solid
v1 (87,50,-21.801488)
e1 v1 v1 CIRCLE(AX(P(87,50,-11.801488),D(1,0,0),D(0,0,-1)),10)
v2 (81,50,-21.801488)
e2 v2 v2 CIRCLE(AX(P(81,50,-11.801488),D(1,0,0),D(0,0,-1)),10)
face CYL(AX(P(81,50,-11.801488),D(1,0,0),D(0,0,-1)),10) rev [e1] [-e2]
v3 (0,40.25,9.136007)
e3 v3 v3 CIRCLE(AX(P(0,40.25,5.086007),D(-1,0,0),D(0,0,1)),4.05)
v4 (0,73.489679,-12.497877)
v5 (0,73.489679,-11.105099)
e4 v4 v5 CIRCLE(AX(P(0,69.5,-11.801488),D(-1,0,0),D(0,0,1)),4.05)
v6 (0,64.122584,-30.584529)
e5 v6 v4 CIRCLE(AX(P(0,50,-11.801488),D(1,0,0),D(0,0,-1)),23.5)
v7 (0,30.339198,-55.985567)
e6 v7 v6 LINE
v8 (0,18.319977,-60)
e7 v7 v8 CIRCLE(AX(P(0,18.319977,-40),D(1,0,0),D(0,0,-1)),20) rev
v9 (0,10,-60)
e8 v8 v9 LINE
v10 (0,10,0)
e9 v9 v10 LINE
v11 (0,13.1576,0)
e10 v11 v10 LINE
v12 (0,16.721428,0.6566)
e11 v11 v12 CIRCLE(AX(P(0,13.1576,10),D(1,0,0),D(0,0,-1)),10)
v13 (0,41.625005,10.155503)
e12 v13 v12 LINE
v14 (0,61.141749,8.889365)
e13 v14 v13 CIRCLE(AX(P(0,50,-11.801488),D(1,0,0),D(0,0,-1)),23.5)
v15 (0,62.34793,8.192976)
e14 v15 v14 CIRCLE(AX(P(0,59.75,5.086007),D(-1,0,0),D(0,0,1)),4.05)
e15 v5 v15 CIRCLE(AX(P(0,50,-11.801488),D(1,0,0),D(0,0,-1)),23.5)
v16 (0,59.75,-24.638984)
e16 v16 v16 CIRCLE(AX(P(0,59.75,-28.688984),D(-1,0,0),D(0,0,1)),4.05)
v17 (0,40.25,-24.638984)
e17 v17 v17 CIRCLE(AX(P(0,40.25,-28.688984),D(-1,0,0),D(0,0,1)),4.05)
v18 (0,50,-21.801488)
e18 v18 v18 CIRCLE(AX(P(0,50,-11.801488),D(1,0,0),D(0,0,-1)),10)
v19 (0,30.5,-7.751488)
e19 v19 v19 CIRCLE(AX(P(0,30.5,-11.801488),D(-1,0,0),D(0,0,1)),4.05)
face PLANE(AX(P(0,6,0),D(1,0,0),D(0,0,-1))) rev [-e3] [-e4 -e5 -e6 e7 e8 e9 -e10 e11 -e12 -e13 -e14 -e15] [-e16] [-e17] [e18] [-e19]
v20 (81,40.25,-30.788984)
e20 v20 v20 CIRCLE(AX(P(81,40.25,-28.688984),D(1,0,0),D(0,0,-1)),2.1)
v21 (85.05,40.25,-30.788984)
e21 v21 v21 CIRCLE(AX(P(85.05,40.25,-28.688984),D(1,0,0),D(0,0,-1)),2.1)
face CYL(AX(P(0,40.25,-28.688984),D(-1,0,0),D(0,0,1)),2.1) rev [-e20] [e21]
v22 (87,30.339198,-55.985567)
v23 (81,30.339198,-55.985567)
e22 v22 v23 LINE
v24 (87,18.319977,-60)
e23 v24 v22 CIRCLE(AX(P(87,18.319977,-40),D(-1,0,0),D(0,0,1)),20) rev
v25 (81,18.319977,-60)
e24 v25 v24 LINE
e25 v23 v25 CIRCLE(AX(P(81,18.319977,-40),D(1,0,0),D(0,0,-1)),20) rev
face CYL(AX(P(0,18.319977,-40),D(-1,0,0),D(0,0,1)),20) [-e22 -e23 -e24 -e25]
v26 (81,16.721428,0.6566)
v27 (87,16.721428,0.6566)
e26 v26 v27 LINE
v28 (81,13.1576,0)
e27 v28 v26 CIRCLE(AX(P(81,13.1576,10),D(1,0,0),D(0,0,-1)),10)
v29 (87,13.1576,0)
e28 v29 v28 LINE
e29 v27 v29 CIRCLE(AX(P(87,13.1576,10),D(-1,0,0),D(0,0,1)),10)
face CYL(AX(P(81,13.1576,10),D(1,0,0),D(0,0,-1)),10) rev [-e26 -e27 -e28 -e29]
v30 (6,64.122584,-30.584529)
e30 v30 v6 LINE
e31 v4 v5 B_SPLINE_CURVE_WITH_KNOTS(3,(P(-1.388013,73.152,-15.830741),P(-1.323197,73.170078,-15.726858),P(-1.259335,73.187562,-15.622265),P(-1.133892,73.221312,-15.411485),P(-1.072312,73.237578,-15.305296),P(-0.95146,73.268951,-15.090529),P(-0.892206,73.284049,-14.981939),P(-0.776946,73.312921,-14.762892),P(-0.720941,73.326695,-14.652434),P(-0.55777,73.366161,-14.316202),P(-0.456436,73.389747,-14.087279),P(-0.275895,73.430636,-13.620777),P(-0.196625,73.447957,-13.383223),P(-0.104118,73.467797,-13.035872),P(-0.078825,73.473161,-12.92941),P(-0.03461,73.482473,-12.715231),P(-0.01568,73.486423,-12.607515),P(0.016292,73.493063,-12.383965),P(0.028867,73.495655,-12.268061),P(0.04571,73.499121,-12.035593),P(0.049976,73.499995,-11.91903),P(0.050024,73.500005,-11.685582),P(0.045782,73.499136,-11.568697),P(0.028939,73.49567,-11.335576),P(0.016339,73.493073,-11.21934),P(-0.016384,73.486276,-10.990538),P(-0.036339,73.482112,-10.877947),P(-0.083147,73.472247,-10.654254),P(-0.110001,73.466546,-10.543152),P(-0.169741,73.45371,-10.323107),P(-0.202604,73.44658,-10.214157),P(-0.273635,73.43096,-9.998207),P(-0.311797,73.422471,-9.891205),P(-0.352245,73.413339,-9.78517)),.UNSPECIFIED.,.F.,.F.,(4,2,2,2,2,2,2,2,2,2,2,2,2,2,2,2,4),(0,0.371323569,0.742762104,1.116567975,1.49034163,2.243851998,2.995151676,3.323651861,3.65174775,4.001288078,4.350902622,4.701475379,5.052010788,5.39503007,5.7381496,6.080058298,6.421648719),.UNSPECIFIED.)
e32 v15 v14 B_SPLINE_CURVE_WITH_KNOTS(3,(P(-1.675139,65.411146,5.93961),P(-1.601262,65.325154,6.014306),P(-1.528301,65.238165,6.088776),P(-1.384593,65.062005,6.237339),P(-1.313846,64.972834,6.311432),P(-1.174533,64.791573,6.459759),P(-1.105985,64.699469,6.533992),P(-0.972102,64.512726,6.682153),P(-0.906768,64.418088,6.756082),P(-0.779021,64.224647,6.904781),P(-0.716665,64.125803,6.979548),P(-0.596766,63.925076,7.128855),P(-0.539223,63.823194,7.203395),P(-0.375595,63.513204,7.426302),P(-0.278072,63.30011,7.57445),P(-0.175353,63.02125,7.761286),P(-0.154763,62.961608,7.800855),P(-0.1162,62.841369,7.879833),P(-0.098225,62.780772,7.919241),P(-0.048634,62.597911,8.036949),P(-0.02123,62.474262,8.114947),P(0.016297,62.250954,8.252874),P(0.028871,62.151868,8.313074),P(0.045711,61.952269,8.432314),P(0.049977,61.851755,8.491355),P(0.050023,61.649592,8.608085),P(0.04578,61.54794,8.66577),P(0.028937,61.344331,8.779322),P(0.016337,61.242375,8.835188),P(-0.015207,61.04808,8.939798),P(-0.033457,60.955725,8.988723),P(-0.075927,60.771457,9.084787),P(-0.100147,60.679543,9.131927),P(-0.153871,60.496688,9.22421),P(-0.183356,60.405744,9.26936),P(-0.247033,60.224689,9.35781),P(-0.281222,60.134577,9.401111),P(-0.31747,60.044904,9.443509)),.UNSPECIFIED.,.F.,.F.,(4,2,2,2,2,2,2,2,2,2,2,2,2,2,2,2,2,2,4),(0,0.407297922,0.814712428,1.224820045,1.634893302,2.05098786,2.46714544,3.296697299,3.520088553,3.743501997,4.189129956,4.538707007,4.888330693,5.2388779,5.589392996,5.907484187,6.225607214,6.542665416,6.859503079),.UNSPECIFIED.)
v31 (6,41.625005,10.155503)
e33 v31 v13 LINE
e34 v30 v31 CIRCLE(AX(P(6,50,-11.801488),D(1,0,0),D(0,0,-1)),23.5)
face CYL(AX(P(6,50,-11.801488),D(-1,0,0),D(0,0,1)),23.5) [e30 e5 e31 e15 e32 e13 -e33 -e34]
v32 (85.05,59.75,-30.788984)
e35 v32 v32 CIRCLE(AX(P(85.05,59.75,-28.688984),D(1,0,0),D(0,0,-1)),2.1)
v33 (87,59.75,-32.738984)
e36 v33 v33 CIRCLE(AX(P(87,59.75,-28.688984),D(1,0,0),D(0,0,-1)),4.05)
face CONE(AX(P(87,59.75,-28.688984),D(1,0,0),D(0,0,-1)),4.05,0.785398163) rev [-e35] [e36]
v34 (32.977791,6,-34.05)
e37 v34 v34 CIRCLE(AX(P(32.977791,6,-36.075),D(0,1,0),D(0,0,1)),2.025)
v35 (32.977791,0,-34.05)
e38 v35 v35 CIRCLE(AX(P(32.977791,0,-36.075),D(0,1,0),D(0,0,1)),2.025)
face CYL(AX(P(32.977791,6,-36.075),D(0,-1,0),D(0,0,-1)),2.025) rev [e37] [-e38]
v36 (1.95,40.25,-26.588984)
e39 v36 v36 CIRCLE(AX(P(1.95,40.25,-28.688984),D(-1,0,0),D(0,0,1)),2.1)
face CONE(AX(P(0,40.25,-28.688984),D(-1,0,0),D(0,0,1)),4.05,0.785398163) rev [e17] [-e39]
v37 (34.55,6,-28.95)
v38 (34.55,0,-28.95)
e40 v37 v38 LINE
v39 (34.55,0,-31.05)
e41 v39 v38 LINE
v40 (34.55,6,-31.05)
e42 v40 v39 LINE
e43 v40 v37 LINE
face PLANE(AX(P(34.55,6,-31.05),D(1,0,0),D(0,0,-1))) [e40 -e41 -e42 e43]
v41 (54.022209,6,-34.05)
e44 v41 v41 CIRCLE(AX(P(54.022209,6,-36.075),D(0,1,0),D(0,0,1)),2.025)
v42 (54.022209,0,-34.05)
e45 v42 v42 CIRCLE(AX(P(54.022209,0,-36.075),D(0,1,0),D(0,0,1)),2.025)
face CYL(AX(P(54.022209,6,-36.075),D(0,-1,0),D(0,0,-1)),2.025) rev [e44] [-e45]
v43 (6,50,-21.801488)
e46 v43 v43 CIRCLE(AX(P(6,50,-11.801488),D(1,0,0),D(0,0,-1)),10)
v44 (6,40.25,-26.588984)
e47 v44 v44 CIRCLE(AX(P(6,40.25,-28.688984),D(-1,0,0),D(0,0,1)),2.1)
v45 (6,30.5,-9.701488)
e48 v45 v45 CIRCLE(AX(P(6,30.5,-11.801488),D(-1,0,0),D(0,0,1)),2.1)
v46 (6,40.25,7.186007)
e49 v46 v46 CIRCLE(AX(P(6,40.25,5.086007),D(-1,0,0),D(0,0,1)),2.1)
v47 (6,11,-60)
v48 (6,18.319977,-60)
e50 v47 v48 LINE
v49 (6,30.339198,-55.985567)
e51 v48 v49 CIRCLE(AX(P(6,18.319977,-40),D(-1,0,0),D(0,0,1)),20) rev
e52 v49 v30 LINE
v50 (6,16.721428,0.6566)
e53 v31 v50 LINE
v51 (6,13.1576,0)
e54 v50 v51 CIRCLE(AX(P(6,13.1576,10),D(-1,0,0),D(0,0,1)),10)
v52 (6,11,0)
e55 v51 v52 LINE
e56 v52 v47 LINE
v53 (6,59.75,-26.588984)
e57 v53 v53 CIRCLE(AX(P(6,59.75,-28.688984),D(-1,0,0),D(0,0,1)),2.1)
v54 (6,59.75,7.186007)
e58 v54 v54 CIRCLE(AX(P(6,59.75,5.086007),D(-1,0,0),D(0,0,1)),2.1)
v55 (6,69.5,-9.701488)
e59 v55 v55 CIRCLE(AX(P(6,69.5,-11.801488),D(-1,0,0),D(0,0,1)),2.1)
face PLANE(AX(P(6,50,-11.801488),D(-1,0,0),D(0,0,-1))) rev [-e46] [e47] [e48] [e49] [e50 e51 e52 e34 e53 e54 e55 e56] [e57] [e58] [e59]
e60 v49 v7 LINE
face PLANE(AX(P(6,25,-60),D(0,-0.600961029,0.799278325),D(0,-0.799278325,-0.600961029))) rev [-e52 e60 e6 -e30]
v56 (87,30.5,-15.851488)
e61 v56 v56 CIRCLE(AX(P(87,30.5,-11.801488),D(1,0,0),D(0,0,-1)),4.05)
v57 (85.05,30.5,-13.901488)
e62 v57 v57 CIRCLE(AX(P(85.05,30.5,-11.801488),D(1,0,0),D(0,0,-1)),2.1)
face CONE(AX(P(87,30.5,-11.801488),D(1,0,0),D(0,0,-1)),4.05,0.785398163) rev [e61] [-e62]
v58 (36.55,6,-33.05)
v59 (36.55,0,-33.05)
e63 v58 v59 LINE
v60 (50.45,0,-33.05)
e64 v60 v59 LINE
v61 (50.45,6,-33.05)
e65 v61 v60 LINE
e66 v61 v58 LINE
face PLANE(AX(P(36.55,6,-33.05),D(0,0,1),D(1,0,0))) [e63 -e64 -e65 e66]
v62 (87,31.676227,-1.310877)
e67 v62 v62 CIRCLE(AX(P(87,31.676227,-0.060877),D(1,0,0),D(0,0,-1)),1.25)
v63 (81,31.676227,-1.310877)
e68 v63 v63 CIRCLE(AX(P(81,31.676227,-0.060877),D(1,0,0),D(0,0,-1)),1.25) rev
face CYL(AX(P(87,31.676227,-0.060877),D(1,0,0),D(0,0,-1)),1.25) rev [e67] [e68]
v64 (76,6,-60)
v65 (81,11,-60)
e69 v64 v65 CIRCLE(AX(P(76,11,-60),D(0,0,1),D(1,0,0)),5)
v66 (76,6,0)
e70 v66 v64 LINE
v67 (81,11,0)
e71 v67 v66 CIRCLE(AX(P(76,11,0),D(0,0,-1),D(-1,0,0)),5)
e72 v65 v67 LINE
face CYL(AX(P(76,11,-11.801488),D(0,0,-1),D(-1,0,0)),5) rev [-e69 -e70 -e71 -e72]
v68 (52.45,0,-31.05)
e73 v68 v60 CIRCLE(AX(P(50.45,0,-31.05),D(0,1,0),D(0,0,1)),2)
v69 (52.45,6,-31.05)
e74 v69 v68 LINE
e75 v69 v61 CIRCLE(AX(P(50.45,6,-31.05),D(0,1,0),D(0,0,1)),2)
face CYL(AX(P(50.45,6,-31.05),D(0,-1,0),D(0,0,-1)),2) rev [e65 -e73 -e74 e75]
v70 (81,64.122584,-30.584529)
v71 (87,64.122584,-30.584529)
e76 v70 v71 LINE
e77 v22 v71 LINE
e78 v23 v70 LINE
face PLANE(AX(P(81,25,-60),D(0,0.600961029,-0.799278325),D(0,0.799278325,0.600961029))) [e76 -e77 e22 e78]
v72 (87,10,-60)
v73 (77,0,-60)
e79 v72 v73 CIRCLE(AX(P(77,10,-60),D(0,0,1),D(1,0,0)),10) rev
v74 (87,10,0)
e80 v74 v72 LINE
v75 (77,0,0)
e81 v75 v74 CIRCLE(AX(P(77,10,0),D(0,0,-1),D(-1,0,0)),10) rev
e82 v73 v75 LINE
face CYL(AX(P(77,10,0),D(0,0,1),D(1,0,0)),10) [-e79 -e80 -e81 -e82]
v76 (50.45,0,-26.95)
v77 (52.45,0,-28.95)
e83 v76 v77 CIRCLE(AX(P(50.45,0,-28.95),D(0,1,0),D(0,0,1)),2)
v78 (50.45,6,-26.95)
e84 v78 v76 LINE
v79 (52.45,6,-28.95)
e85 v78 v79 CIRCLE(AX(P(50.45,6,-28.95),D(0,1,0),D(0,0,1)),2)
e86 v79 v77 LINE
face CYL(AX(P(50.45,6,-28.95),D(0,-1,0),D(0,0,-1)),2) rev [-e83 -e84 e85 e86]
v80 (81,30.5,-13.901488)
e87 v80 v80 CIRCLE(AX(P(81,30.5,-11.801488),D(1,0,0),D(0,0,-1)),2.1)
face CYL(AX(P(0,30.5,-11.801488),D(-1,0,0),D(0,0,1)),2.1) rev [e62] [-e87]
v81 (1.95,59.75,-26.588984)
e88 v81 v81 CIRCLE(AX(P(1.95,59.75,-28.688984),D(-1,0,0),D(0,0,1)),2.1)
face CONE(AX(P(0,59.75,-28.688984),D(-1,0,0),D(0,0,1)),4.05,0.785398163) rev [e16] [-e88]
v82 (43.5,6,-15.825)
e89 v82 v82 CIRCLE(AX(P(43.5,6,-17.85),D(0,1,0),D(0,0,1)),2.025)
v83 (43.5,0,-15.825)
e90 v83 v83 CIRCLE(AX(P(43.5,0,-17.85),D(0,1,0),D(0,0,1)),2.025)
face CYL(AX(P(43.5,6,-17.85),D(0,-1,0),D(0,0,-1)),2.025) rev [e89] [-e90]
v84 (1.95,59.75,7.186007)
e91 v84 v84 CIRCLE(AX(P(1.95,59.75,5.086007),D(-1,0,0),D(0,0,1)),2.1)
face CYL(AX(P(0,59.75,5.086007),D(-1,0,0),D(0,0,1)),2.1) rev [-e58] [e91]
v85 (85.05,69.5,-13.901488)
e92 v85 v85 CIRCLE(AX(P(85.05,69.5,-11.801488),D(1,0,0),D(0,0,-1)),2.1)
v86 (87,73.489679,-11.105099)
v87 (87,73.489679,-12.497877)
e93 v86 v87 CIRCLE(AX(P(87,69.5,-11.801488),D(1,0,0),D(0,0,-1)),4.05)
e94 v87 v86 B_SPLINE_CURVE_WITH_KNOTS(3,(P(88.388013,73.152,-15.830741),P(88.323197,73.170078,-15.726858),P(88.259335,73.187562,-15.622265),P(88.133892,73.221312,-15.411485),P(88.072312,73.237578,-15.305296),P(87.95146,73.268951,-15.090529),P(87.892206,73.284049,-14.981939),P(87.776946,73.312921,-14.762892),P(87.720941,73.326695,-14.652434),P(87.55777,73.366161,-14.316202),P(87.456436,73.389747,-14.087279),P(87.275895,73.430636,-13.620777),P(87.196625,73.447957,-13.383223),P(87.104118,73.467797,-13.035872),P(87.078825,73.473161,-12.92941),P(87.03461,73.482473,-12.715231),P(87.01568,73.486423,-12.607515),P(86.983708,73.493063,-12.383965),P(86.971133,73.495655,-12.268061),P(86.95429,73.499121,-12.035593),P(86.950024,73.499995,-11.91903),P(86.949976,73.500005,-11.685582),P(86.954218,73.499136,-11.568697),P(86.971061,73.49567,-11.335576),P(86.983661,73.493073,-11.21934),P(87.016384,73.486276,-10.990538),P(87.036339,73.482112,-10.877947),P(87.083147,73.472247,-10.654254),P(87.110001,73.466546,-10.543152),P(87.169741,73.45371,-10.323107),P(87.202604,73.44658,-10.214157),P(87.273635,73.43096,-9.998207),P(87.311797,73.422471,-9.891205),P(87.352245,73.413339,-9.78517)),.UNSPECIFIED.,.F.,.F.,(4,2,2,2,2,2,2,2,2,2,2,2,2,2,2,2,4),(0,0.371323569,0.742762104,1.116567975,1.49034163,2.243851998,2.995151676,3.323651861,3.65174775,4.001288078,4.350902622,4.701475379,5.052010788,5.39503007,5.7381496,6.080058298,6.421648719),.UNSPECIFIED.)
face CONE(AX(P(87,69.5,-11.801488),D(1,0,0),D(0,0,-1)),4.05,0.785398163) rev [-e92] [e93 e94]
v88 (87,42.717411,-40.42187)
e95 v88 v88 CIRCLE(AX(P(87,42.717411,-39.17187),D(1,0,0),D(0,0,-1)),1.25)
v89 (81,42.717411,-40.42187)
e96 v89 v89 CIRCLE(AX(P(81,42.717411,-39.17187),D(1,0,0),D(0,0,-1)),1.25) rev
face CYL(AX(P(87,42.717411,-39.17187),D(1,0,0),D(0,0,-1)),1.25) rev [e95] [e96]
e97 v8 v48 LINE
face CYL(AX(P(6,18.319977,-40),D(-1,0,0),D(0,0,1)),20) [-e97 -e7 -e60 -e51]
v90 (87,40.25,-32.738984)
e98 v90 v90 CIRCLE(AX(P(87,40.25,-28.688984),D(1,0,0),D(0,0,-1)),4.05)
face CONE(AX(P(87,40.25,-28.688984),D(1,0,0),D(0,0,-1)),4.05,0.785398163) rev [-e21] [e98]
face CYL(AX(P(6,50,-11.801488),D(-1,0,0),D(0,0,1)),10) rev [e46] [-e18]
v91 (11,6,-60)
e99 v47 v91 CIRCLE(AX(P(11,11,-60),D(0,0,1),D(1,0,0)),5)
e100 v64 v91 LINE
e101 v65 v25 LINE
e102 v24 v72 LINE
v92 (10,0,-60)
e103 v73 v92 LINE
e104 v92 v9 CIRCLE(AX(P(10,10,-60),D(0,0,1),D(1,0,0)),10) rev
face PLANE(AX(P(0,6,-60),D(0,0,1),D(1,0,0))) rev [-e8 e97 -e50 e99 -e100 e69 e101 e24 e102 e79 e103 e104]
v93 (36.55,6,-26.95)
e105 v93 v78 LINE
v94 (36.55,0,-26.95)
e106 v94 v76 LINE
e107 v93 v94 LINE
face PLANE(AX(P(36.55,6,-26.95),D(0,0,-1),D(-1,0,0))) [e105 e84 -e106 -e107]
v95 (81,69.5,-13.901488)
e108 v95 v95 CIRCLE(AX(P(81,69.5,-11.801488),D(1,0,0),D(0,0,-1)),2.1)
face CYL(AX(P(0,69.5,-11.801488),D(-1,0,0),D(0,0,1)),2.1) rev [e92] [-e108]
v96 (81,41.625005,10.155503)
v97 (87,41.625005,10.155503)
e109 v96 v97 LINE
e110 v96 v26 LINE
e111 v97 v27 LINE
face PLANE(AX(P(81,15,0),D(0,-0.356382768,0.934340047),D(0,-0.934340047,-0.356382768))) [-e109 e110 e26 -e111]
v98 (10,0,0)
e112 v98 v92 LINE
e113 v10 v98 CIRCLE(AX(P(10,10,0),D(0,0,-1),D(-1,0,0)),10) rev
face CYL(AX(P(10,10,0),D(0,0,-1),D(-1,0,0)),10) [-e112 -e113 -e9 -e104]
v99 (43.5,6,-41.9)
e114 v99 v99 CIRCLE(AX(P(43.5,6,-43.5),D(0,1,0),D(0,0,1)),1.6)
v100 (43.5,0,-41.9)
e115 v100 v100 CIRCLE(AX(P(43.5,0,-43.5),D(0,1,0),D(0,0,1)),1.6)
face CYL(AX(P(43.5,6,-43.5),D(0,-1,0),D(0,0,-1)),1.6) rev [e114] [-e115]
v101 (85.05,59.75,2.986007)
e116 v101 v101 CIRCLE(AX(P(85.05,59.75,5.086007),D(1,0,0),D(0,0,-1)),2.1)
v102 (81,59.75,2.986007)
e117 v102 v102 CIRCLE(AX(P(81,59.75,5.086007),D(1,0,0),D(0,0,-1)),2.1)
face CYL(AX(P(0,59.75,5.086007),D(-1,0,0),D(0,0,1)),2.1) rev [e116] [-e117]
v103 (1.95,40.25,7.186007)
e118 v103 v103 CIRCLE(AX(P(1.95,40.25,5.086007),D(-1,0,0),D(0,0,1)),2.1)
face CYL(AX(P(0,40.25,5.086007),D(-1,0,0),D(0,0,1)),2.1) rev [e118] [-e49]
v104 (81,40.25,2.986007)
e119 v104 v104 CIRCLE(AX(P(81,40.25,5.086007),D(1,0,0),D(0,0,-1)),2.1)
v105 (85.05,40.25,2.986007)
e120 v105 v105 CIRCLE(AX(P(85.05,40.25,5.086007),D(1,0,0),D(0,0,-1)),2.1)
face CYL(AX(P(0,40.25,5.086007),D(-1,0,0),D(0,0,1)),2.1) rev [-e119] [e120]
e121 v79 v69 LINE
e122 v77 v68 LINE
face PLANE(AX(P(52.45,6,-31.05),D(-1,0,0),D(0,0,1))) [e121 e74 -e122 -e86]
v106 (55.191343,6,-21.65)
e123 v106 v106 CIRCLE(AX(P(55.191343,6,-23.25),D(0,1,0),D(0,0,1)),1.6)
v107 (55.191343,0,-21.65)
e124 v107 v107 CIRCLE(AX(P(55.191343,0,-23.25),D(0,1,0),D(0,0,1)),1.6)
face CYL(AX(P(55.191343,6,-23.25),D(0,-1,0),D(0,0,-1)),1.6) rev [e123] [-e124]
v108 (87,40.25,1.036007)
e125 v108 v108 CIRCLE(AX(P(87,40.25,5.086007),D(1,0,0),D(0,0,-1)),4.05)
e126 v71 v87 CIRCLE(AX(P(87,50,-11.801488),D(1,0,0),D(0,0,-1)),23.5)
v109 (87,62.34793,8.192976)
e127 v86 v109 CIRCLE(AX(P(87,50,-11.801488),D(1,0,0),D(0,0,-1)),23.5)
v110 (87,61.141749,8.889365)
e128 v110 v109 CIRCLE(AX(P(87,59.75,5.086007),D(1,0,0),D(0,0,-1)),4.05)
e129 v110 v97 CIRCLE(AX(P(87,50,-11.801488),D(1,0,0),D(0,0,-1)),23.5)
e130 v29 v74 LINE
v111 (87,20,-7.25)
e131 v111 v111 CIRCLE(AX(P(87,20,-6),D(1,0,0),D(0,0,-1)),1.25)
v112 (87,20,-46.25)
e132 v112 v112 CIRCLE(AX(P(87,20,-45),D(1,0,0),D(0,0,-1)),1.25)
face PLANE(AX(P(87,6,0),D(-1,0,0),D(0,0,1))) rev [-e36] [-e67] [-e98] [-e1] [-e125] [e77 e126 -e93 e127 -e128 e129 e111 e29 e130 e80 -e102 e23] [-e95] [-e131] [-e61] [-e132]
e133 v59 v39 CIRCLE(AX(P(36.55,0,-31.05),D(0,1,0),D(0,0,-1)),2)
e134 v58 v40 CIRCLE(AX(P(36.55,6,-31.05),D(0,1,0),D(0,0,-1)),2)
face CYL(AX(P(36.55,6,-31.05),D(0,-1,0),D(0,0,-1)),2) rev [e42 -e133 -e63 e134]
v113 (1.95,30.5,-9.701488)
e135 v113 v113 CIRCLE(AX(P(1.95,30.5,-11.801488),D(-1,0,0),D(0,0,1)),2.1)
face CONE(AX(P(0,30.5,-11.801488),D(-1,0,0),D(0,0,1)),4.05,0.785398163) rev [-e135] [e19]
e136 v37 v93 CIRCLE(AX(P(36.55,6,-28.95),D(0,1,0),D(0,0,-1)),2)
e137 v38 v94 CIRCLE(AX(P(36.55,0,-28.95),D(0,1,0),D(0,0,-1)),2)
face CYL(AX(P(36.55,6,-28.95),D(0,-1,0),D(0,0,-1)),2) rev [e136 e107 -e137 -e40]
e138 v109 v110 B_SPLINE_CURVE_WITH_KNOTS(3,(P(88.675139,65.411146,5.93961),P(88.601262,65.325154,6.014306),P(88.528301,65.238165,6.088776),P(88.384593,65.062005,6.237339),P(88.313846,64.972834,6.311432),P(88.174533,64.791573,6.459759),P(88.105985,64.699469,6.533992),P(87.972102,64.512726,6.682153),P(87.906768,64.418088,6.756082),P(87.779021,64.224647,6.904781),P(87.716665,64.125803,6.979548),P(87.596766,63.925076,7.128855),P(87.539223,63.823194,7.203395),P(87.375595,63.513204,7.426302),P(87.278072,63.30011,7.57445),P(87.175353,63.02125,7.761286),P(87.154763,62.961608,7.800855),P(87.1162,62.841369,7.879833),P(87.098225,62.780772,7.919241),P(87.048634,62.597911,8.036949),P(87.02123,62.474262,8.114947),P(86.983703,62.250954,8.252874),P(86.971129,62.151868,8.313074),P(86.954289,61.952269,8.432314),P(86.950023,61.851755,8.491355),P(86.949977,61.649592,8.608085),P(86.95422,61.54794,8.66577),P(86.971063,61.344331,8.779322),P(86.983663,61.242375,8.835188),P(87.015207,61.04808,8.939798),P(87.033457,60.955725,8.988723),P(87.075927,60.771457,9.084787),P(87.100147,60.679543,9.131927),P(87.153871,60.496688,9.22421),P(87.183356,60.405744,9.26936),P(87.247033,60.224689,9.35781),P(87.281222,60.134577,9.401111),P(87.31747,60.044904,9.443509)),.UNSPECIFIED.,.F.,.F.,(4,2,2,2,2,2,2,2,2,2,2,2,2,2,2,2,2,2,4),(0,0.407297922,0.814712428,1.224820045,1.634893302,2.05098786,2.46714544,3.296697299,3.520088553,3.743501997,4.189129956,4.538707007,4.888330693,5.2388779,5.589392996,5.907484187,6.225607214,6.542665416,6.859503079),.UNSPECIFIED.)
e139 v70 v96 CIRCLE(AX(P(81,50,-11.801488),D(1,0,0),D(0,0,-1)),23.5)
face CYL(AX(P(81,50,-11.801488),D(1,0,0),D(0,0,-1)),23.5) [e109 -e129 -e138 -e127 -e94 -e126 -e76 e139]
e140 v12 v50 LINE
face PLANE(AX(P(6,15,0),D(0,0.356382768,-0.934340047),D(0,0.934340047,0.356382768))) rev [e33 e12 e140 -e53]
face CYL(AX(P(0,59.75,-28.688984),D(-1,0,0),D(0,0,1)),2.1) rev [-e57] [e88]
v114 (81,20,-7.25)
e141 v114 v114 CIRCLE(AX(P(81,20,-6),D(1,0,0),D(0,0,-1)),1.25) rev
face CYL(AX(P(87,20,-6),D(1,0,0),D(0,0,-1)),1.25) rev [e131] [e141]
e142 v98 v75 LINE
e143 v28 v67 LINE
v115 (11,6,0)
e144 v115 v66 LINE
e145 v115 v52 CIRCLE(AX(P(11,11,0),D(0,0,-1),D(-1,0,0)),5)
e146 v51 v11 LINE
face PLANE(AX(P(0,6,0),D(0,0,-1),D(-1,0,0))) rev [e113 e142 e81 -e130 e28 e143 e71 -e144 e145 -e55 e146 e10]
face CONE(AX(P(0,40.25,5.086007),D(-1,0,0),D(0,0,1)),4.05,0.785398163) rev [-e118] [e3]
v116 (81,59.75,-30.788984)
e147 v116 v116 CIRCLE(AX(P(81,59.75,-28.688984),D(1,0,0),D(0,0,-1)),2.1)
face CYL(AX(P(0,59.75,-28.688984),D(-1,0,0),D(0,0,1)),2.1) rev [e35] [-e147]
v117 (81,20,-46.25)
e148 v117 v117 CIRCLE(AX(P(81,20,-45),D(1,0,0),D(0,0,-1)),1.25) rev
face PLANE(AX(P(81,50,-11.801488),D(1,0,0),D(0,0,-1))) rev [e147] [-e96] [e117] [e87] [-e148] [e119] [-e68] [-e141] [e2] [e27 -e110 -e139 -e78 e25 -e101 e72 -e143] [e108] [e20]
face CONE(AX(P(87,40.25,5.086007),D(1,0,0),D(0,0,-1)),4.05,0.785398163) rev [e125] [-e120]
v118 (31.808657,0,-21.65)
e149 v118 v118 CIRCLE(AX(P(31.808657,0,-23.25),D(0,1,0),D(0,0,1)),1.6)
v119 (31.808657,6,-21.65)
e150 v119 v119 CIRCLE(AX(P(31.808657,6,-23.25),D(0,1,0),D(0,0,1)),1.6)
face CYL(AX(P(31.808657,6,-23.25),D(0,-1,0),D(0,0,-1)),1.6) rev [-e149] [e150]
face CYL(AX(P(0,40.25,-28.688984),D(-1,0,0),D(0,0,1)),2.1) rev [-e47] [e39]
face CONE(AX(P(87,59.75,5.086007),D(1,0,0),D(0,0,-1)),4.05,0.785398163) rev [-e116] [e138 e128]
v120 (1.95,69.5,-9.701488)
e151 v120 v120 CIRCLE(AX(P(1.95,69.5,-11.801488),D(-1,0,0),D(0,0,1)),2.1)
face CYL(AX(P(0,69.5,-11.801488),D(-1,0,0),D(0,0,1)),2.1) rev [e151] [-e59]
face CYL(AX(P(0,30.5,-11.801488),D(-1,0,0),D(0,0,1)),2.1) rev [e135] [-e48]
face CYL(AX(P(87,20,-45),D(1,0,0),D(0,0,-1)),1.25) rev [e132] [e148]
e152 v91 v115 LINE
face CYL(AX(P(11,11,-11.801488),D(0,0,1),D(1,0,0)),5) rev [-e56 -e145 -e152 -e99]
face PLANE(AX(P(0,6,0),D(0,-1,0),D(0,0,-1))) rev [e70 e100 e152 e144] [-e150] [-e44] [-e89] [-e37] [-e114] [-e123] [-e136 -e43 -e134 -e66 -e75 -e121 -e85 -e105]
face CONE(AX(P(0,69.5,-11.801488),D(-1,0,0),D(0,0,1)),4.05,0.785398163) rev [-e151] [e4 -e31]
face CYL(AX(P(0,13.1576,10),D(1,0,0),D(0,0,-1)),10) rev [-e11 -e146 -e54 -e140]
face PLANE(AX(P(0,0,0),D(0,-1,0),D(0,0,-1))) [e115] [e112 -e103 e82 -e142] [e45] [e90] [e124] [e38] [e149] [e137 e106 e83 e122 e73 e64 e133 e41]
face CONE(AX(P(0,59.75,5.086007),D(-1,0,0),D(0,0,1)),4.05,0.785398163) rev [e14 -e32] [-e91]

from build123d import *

# Parameters (mm, degrees)
SKETCH_1_W                   = 87
SKETCH_1_H                   = 60
SKETCH_1_R                   = 1.6
SKETCH_1_R_2                 = 2.025
EXTRUDE_1_DEPTH              = 6
SKETCH_2_R                   = 10
SKETCH_2_R_2                 = 2.05
EXTRUDE_2_DEPTH              = 6
FILLET_1_R                   = 20
FILLET_3_R                   = 5
FILLET_4_R                   = 10
FILLET_5_R                   = 10
HOLE_START                   = 81
HOLE_WIZARD_M3_1_OUTLINE_R   = 1.25
HOLE_WIZARD_M3_1_DEPTH       = 6
HOLE_WIZARD_M4_1_D           = 4.2
HOLE_WIZARD_M4_1_CSINK_D     = 8.1
HOLE_WIZARD_M4_1_CSINK_ANGLE = 90
HOLE_WIZARD_M4_2_D           = 4.2
HOLE_WIZARD_M4_2_CSINK_D     = 8.1
HOLE_WIZARD_M4_2_CSINK_ANGLE = 90


# Read off the part's stored shape, not the designer's step: M3 螺纹孔1
with BuildPart() as part:
    # 草图1 → 凸台-拉伸1 (new body)
    with BuildSketch(Plane(origin=(0, 0, 0), x_dir=(1, 0, 0), z_dir=(0, 1, 0))):
        with Locations((43.5, 30)):
            Rectangle(SKETCH_1_W, SKETCH_1_H)
        with Locations(Location((43.5, 43.5, 0), (0, 0, 270))):
            Circle(SKETCH_1_R, mode=Mode.SUBTRACT)
        with Locations(Location((55.191342951, 23.25, 0), (0, 0, 270))):
            Circle(SKETCH_1_R, mode=Mode.SUBTRACT)
        with Locations(Location((31.808657049, 23.25, 0), (0, 0, 270))):
            Circle(SKETCH_1_R, mode=Mode.SUBTRACT)
        with Locations(Location((54.022208656, 36.075, 0), (0, 0, 270))):
            Circle(SKETCH_1_R_2, mode=Mode.SUBTRACT)
        with Locations(Location((43.5, 17.85, 0), (0, 0, 270))):
            Circle(SKETCH_1_R_2, mode=Mode.SUBTRACT)
        with Locations(Location((32.977791344, 36.075, 0), (0, 0, 270))):
            Circle(SKETCH_1_R_2, mode=Mode.SUBTRACT)
        with BuildLine():
            Line((36.55, 33.05), (50.45, 33.05))
            ThreePointArc((50.45, 33.05), (51.864213562, 32.464213562), (52.45, 31.05))
            Line((52.45, 31.05), (52.45, 28.95))
            ThreePointArc((52.45, 28.95), (51.864213562, 27.535786438), (50.45, 26.95))
            Line((50.45, 26.95), (36.55, 26.95))
            ThreePointArc((36.55, 26.95), (35.135786438, 27.535786438), (34.55, 28.95))
            Line((34.55, 28.95), (34.55, 31.05))
            ThreePointArc((34.55, 31.05), (35.135786438, 32.464213562), (36.55, 33.05))
        make_face(mode=Mode.SUBTRACT)
    extrude(amount=EXTRUDE_1_DEPTH)

    # 草图2 → 凸台-拉伸2 (add)
    with BuildSketch(Plane(origin=(87, 0, 0), x_dir=(0, 0, -1), z_dir=(1, 0, 0))):
        with BuildLine():
            Line((60, 0), (60, 25))
            Line((60, 25), (30.584528933, 64.122584185))
            ThreePointArc((30.584528933, 64.122584185), (0.441305267, 70.571734049), (-10.155502807, 41.625004949))
            Line((-10.155502807, 41.625004949), (0, 15))
            Line((0, 15), (0, 0))
            Line((0, 0), (60, 0))
        make_face()
        with Locations((11.801488287, 50)):
            Circle(SKETCH_2_R, mode=Mode.SUBTRACT)
        with Locations((11.801488287, 69.5)):
            Circle(SKETCH_2_R_2, mode=Mode.SUBTRACT)
        with Locations((28.68898366, 59.75)):
            Circle(SKETCH_2_R_2, mode=Mode.SUBTRACT)
        with Locations((28.68898366, 40.25)):
            Circle(SKETCH_2_R_2, mode=Mode.SUBTRACT)
        with Locations((11.801488287, 30.5)):
            Circle(SKETCH_2_R_2, mode=Mode.SUBTRACT)
        with Locations((-5.086007087, 40.25)):
            Circle(SKETCH_2_R_2, mode=Mode.SUBTRACT)
        with Locations((-5.086007087, 59.75)):
            Circle(SKETCH_2_R_2, mode=Mode.SUBTRACT)
    extrude_2 = extrude(amount=-EXTRUDE_2_DEPTH)

    # 镜向1: 凸台-拉伸2 across plane
    add(extrude_2.mirror(Plane(origin=(43.5, 0, 0), x_dir=(0, 0, 1), z_dir=(1, 0, 0))))

    # 圆角1
    fillet_1_edges = [part.edges().sort_by_distance(p)[0] for p in [
        (3, 25, -60),
        (84, 25, -60),
    ]]
    fillet(fillet_1_edges, radius=FILLET_1_R)

    # 圆角3
    fillet_3_edges = [part.edges().sort_by_distance(p)[0] for p in [
        (6, 6, -30),
        (81, 6, -30),
    ]]
    fillet(fillet_3_edges, radius=FILLET_3_R)

    # 圆角4
    fillet_4_edges = [part.edges().sort_by_distance(p)[0] for p in [
        (87, 0, -30),
        (0, 0, -30),
    ]]
    fillet(fillet_4_edges, radius=FILLET_4_R)

    # 圆角5
    fillet_5_edges = [part.edges().sort_by_distance(p)[0] for p in [
        (3, 15, 0),
        (84, 15, 0),
    ]]
    fillet(fillet_5_edges, radius=FILLET_5_R)

    # Hole Wizard M3 _1 outline → Hole Wizard M3 _1 (cut)
    with BuildSketch(Plane.YZ.offset(HOLE_START)):
        with Locations((20, -6)):
            Circle(HOLE_WIZARD_M3_1_OUTLINE_R)
        with Locations((42.717410522, -39.171869507)):
            Circle(HOLE_WIZARD_M3_1_OUTLINE_R)
        with Locations((20, -45)):
            Circle(HOLE_WIZARD_M3_1_OUTLINE_R)
        with Locations((31.676227091, -0.060877223)):
            Circle(HOLE_WIZARD_M3_1_OUTLINE_R)
    extrude(amount=HOLE_WIZARD_M3_1_DEPTH, mode=Mode.SUBTRACT)

    # M4 十字槽半沉头木螺钉的锥形沉头孔1 (through all)
    with Locations(Plane.ZY):
        with Locations((-11.801488287, 69.5), (-28.68898366, 59.75), (-28.68898366, 40.25), (-11.801488287, 30.5), (5.086007087, 40.25), (5.086007087, 59.75)):
            CounterSinkHole(HOLE_WIZARD_M4_1_D / 2, HOLE_WIZARD_M4_1_CSINK_D / 2, counter_sink_angle=HOLE_WIZARD_M4_1_CSINK_ANGLE)

    # M4 十字槽半沉头木螺钉的锥形沉头孔2 (through all)
    with Locations(Plane(origin=(87, 0, 0), x_dir=(0, 0, -1), z_dir=(1, 0, 0))):
        with Locations((11.801488287, 69.5), (-5.086007087, 59.75), (-5.086007087, 40.25), (11.801488287, 30.5), (28.68898366, 40.25), (28.68898366, 59.75)):
            CounterSinkHole(HOLE_WIZARD_M4_2_D / 2, HOLE_WIZARD_M4_2_CSINK_D / 2, counter_sink_angle=HOLE_WIZARD_M4_2_CSINK_ANGLE)


solid = part.part
